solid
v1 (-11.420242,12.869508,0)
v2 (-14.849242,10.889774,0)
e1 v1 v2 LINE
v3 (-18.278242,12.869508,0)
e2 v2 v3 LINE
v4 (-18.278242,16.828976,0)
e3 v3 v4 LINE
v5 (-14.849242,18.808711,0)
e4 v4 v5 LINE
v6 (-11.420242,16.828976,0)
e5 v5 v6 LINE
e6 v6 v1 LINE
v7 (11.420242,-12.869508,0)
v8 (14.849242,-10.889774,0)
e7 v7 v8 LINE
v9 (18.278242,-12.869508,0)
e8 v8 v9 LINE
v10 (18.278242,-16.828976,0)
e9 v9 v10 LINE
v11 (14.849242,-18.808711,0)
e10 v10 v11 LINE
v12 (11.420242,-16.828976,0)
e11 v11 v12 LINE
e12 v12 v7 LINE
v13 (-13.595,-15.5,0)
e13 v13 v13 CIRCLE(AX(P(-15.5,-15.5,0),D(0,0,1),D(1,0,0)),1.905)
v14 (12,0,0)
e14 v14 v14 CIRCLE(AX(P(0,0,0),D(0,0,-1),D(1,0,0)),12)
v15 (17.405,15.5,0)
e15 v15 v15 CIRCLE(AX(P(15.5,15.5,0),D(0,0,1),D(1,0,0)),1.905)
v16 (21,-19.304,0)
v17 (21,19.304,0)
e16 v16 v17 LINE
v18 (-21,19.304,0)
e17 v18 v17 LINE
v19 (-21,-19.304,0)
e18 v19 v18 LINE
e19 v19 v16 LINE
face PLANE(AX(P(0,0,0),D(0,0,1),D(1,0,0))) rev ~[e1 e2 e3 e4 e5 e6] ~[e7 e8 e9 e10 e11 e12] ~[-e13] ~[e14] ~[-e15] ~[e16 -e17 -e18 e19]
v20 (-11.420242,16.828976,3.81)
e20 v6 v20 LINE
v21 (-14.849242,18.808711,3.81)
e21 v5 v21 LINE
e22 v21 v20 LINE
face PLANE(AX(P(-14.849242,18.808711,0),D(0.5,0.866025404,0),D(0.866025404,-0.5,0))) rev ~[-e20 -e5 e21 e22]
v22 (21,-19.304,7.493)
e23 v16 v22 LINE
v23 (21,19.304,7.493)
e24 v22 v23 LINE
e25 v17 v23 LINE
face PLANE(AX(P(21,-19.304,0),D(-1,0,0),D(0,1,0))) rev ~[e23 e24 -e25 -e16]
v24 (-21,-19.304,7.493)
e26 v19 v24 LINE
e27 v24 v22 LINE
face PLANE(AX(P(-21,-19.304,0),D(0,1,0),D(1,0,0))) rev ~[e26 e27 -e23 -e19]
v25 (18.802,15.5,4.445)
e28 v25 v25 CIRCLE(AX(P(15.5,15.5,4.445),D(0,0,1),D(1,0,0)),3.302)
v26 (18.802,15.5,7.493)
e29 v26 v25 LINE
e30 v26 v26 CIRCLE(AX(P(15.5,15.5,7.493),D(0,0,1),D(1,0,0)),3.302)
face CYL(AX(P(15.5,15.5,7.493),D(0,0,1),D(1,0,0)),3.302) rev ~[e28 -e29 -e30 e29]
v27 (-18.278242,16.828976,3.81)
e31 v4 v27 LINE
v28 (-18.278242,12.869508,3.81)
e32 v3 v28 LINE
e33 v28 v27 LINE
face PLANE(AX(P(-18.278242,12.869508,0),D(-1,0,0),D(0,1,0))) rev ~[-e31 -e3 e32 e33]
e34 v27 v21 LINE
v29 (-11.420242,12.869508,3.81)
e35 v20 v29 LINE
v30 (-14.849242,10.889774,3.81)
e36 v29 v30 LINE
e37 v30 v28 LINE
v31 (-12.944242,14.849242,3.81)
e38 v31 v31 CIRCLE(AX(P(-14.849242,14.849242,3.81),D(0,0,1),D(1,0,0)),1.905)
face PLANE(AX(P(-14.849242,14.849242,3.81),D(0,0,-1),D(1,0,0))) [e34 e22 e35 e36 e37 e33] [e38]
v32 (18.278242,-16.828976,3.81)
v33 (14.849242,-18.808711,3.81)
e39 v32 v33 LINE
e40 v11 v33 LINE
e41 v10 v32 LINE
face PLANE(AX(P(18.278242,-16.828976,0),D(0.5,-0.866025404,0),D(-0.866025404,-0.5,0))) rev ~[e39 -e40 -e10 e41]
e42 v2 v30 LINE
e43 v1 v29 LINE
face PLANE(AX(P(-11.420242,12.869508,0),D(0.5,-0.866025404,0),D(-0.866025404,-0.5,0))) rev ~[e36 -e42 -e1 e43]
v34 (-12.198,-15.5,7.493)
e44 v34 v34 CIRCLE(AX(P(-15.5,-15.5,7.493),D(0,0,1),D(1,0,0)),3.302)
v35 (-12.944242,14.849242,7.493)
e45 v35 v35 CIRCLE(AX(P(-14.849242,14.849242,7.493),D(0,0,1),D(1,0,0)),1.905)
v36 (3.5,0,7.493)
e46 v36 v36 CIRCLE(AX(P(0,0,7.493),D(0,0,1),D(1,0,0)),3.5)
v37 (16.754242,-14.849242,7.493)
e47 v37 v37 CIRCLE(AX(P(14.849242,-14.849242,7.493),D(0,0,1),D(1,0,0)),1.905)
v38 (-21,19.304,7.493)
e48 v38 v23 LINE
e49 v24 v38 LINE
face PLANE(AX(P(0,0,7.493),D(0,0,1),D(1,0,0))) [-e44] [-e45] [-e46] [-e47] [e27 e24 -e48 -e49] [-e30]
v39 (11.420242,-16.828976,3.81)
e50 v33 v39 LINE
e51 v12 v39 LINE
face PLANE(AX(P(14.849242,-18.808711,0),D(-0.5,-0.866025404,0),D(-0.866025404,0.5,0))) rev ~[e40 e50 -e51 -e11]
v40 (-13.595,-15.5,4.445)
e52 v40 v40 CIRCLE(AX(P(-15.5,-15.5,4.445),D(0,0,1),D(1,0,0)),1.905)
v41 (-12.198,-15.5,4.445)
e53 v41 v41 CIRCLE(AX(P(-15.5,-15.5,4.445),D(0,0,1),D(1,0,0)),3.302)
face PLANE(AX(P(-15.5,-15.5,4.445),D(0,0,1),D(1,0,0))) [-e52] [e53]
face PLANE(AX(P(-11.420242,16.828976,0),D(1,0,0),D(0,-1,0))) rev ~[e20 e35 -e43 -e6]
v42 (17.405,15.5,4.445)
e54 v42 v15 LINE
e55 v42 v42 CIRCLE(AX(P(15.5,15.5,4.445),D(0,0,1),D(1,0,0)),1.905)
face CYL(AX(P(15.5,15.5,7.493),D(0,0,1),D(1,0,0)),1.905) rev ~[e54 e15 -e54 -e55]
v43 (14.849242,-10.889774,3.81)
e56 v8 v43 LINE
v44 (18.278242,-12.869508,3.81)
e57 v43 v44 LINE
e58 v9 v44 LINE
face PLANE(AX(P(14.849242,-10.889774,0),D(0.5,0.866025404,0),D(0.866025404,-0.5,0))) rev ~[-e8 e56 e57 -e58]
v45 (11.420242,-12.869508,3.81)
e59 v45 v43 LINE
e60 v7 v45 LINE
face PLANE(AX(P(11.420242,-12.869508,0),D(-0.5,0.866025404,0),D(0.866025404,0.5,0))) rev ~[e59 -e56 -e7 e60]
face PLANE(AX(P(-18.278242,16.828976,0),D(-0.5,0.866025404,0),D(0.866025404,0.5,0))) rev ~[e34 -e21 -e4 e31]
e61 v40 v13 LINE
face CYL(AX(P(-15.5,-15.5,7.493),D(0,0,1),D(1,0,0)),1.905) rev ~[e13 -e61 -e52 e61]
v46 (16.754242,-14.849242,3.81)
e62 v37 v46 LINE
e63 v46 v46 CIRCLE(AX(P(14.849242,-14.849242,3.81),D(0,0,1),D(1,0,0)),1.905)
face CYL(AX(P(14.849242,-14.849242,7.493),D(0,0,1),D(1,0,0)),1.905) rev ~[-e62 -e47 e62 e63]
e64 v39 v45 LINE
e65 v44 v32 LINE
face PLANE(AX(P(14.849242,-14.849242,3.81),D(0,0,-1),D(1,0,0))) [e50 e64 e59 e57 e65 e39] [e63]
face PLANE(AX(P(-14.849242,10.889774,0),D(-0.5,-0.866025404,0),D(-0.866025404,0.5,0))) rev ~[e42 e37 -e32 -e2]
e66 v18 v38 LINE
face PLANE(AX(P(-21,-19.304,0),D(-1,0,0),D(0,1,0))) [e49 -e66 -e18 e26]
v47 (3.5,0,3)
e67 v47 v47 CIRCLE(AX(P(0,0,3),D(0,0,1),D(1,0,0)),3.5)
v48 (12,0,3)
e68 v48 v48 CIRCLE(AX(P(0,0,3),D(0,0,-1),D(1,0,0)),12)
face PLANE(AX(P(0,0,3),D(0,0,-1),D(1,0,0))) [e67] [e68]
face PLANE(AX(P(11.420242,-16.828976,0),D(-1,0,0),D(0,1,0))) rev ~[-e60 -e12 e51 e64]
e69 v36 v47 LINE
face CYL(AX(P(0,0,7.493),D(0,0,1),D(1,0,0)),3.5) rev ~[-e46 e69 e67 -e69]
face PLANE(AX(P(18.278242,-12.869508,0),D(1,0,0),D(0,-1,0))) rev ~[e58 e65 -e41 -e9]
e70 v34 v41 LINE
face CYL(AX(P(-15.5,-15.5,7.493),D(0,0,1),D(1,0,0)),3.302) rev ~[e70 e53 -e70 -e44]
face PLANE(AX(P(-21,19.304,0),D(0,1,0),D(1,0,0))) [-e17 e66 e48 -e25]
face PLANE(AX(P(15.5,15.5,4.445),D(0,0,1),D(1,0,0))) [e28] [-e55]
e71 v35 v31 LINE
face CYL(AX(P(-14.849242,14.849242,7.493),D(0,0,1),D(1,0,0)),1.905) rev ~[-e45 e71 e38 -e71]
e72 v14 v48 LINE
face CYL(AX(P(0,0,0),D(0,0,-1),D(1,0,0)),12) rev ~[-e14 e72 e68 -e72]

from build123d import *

# Parameters (mm, degrees)
F0_W      = 42
F0_H      = 38.608
F1_DEPTH  = 7.493
F2_R      = 1.905
F3_DEPTH  = 7.494
F4_R      = 1.905
F5_DEPTH  = 25.4
F6_R      = 3.302
F6_R_2    = 1.905
F7_DEPTH  = 3.048
F8_R      = 3.5
F9_DEPTH  = 7.494
F10_R     = 12
F11_DEPTH = 3
F13_DEPTH = 3.81


with BuildPart() as f1:
    # F0 (on Top) → F1 (new body)
    with BuildSketch(Plane.XY):
        Rectangle(F0_W, F0_H)
    extrude(amount=F1_DEPTH)

    # F2 (on face) → F3 (cut, through all)
    with BuildSketch(Plane.XY.offset(7.493)):
        with Locations((-14.8492424049, 14.8492424049)):
            Circle(F2_R)
        with Locations((14.8492424049, -14.8492424049)):
            Circle(F2_R)
    extrude(amount=-F3_DEPTH, mode=Mode.SUBTRACT)

    # F4 (on face) → F5 (cut)
    with BuildSketch(Plane.XY.offset(7.493)):
        with Locations((15.5, 15.5)):
            Circle(F4_R)
        with Locations((-15.5, -15.5)):
            Circle(F4_R)
    extrude(amount=-F5_DEPTH, mode=Mode.SUBTRACT)

    # F6 (on face) → F7 (cut)
    with BuildSketch(Plane.XY.offset(7.493)):
        with Locations((15.5, 15.5)):
            Circle(F6_R)
        with Locations((15.5, 15.5)):
            Circle(F6_R_2, mode=Mode.SUBTRACT)
        with Locations((-15.5, -15.5)):
            Circle(F6_R)
        with Locations((-15.5, -15.5)):
            Circle(F6_R_2, mode=Mode.SUBTRACT)
        with Locations((15.5, 15.5)):
            Circle(F6_R_2)
        with Locations((-15.5, -15.5)):
            Circle(F6_R_2)
    extrude(amount=-F7_DEPTH, mode=Mode.SUBTRACT)

    # F8 (on face) → F9 (cut, through all)
    with BuildSketch(Plane.XY.offset(7.493)):
        Circle(F8_R)
    extrude(amount=-F9_DEPTH, mode=Mode.SUBTRACT)

    # F10 (on face) → F11 (cut)
    with BuildSketch(Plane(origin=(0, 0, 0), x_dir=(1, 0, 0), z_dir=(0, 0, -1))):
        Circle(F10_R)
    extrude(amount=-F11_DEPTH, mode=Mode.SUBTRACT)

    # F12 (on face) → F13 (cut)
    with BuildSketch(Plane(origin=(0, 0, 0), x_dir=(1, 0, 0), z_dir=(0, 0, -1))):
        Polygon((18.2782424049, 12.8695083319), (18.2782424049, 16.828976478), (14.8492424049, 18.808710551), (11.4202424049, 16.828976478), (11.4202424049, 12.8695083319), (14.8492424049, 10.8897742588), align=None)
        Polygon((-11.4202424049, -16.828976478), (-11.4202424049, -12.8695083319), (-14.8492424049, -10.8897742588), (-18.2782424049, -12.8695083319), (-18.2782424049, -16.828976478), (-14.8492424049, -18.808710551), align=None)
    extrude(amount=-F13_DEPTH, mode=Mode.SUBTRACT)


solid = f1.part
